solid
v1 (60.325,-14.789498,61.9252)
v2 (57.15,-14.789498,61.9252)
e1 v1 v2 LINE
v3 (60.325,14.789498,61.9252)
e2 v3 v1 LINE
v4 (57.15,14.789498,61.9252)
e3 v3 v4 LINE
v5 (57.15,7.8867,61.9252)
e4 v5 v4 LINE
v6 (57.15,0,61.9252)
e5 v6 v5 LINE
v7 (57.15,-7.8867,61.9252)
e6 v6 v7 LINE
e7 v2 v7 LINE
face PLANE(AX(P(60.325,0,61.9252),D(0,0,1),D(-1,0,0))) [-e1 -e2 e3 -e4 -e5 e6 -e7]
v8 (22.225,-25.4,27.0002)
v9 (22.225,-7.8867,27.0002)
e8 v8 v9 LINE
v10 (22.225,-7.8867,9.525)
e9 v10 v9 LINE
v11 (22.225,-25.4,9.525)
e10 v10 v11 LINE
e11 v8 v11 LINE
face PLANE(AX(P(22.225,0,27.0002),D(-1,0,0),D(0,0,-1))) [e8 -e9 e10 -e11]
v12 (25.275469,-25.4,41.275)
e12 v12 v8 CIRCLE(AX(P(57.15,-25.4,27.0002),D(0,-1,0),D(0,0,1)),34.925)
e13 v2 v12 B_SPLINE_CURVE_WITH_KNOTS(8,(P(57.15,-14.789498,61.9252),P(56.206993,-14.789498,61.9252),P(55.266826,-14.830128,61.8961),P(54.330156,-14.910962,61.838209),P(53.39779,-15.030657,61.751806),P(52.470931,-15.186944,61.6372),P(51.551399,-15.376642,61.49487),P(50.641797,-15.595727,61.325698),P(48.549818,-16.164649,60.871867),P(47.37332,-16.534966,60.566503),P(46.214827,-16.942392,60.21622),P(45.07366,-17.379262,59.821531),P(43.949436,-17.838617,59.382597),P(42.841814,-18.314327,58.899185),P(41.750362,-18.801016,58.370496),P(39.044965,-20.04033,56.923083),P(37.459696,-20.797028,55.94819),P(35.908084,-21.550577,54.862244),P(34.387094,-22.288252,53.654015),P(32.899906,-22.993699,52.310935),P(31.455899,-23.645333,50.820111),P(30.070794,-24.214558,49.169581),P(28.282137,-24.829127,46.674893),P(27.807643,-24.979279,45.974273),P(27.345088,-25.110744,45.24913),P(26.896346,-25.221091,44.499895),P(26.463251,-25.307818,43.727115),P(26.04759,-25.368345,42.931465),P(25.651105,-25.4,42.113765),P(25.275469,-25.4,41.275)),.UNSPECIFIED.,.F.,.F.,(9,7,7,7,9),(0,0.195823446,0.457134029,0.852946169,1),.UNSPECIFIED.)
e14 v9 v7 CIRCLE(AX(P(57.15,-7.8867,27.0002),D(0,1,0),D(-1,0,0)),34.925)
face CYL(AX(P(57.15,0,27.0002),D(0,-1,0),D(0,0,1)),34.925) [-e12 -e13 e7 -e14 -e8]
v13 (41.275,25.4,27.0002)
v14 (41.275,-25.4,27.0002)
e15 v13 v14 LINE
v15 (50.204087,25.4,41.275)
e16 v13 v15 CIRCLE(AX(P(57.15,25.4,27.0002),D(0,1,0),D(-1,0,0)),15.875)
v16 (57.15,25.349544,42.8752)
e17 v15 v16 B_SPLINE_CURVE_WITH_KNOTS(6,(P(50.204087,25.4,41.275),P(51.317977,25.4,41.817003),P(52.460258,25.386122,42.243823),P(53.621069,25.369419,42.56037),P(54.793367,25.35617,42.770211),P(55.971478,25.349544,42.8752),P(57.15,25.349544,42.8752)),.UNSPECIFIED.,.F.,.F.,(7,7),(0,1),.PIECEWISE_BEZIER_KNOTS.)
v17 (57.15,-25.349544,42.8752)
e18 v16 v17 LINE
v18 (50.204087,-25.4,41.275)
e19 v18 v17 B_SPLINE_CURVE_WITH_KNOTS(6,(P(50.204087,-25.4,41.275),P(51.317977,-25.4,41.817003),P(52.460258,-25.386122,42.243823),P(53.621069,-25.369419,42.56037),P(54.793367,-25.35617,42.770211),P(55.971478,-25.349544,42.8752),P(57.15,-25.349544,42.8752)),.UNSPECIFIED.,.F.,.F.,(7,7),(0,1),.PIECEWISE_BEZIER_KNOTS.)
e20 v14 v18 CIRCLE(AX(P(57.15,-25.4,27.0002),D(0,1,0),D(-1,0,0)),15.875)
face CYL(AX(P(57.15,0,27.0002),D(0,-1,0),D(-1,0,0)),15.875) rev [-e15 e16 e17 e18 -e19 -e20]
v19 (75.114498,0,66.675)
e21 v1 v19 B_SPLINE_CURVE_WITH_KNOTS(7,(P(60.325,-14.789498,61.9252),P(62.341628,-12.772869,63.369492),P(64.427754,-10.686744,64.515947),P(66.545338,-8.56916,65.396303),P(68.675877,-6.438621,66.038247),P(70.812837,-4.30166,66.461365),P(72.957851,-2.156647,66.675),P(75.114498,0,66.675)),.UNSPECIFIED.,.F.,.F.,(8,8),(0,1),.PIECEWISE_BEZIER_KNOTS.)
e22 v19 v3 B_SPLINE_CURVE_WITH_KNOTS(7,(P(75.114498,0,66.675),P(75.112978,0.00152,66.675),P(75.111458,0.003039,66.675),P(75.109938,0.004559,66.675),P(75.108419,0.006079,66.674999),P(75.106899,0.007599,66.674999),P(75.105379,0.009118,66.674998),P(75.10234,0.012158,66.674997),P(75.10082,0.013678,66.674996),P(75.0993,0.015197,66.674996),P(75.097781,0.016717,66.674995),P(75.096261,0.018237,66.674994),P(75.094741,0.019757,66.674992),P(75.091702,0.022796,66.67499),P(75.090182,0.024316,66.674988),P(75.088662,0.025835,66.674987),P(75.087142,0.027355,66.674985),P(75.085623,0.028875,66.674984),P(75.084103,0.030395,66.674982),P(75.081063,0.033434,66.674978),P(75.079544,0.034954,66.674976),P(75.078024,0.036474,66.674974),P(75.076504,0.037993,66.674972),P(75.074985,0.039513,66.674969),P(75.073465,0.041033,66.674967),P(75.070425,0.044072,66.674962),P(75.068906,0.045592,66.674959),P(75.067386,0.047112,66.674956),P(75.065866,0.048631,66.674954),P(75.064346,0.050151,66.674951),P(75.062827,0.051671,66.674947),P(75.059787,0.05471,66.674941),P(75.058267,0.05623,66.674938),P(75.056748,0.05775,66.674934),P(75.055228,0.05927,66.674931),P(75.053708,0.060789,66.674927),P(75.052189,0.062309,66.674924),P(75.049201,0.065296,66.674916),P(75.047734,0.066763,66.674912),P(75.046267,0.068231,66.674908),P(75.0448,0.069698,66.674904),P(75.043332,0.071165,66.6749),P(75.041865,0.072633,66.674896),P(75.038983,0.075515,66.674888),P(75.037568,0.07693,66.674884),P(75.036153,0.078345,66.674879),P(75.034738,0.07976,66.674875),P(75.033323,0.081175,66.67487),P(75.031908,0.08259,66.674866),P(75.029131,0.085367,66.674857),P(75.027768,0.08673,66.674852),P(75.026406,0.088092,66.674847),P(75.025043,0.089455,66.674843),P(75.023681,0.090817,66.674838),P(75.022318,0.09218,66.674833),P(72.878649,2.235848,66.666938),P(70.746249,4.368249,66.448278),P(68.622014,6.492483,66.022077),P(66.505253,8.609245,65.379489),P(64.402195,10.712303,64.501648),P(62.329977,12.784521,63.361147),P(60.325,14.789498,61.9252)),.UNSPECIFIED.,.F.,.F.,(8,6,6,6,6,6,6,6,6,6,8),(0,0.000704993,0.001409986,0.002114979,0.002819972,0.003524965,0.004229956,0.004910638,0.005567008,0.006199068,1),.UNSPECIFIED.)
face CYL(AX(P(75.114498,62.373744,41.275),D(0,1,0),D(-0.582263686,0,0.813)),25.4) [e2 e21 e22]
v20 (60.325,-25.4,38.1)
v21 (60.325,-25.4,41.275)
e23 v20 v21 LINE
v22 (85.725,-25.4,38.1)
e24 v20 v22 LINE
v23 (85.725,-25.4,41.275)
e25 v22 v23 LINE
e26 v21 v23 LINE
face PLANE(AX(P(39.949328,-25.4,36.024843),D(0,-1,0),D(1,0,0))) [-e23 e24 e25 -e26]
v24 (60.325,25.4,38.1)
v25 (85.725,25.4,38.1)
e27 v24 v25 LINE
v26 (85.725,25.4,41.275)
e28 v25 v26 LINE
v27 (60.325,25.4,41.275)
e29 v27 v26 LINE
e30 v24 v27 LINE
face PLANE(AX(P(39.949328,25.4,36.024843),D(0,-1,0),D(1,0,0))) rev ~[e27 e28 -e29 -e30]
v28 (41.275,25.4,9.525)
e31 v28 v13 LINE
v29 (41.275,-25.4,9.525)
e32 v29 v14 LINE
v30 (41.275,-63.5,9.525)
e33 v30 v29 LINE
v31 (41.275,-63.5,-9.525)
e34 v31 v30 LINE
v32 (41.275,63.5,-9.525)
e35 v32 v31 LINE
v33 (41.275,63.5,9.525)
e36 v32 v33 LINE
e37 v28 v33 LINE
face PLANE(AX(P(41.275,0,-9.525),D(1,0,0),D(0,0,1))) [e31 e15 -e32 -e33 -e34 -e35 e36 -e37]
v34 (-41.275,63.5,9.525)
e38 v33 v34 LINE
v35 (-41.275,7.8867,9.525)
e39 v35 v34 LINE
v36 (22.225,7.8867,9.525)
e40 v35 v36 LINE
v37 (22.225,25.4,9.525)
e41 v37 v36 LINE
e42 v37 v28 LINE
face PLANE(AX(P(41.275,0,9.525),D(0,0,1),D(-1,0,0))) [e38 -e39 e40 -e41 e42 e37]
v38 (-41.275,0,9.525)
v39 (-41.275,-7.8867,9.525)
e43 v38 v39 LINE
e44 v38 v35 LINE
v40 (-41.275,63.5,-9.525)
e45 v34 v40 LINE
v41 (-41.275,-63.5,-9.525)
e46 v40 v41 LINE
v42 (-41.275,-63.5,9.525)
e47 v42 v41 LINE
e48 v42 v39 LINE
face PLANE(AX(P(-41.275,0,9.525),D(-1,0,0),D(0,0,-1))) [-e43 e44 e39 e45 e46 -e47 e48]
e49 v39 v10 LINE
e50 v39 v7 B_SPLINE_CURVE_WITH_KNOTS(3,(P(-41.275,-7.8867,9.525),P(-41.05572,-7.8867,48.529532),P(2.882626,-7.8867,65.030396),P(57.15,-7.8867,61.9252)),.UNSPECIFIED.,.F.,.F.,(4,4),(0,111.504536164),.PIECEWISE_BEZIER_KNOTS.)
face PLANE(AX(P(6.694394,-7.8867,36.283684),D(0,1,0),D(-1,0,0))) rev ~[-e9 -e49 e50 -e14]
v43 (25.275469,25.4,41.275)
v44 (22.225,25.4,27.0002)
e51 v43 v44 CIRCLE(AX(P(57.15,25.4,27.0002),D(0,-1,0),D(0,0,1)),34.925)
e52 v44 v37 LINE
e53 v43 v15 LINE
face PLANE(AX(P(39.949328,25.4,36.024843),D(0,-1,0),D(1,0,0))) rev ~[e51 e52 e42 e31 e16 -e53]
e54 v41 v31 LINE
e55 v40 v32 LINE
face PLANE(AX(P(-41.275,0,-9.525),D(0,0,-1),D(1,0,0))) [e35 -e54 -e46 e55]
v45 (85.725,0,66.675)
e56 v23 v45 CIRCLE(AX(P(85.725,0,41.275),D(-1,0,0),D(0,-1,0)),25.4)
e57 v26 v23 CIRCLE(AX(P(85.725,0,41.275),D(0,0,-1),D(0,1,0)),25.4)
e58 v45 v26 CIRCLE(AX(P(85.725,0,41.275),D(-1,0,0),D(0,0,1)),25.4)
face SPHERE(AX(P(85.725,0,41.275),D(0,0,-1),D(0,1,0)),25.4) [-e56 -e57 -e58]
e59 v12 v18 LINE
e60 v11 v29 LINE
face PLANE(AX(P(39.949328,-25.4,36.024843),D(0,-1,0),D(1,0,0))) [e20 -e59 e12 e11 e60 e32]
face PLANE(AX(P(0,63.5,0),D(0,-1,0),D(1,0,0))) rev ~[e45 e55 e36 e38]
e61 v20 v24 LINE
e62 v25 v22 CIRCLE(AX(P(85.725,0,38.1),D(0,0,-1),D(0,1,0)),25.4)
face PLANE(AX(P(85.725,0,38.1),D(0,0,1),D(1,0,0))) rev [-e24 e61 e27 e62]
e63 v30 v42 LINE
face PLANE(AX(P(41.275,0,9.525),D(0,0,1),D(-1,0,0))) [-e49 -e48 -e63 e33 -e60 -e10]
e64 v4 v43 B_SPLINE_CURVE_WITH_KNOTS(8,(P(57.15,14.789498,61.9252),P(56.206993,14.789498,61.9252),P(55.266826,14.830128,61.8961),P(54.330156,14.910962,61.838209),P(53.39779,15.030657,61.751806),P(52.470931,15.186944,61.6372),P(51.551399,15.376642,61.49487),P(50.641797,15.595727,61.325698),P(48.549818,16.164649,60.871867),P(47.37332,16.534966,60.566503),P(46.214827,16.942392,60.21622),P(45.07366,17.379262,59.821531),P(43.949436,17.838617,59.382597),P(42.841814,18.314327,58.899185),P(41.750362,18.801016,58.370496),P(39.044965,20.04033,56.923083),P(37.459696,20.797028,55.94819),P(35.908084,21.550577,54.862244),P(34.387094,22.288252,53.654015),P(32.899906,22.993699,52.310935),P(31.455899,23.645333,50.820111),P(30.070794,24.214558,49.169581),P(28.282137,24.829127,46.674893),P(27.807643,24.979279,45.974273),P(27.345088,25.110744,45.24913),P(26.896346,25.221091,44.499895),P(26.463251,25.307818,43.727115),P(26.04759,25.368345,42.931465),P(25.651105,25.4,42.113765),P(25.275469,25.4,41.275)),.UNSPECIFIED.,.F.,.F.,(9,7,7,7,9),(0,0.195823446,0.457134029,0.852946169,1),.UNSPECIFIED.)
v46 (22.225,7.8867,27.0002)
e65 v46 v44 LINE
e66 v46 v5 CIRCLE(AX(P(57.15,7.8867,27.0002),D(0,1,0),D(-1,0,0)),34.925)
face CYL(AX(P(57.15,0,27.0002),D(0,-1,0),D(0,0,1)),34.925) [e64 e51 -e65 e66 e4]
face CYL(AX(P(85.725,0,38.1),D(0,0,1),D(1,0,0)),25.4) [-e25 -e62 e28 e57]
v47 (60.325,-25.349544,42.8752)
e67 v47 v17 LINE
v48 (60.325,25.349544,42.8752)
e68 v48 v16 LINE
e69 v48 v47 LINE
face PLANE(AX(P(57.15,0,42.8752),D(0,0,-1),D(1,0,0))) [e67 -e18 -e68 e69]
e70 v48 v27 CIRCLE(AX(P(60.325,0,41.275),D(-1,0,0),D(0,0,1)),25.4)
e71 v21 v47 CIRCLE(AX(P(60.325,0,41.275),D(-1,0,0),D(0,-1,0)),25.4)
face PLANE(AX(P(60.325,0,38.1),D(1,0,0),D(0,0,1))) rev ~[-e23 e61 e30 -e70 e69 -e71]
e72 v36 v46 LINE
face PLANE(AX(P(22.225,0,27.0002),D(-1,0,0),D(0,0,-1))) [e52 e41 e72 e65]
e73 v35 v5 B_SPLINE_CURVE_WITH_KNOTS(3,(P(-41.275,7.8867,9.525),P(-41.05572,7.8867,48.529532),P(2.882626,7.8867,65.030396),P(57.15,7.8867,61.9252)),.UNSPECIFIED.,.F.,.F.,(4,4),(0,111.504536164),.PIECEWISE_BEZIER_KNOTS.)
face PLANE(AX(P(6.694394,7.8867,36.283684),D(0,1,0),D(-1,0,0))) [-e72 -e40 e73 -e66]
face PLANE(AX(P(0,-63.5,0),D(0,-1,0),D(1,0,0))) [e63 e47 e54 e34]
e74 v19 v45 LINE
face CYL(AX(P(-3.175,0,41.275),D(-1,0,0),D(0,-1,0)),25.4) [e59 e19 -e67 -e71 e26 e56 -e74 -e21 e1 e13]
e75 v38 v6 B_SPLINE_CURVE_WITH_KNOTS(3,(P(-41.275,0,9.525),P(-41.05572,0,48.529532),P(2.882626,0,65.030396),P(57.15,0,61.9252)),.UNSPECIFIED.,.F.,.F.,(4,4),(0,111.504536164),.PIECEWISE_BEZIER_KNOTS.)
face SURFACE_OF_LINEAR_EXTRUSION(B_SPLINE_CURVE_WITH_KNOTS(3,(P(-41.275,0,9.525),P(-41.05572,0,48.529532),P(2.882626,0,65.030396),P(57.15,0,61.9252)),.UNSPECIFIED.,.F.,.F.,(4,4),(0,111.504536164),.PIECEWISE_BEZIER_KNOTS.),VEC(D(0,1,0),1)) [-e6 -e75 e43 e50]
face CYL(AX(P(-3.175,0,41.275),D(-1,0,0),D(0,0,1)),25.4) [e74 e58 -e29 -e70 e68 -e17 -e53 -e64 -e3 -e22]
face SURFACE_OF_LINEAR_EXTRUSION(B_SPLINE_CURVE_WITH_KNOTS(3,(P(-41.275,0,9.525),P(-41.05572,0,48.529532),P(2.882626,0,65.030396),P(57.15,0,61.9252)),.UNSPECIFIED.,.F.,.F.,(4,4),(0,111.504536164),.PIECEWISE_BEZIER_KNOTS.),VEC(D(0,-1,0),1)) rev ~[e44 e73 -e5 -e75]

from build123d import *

# Parameters (mm, degrees)
F1_DEPTH    = 63.5
F0_W        = 25.4
F0_H        = 19.05
F0_H_2      = 4.7498
F0_H_3      = 4.7752
F2_DEPTH    = 25.4
F3_DEPTH    = 7.8867
F5_T1_DEPTH = 124.7474881183
F5_T3_DEPTH = 88.9
F5_T6_ANGLE = 180


# Not quite as in the source:
# - a fillet or chamfer that OpenCascade refuses, or shapes differently, is made with other operations: its cross-section is extruded or revolved along the edge and cut away or added


with BuildPart() as f1:
    # F0 (on Front) → F1 (new body, symmetric)
    with BuildSketch(Plane.XZ):
        Polygon((22.225, 9.525), (-41.275, 9.525), (-41.275, -9.525), (41.275, -9.525), (41.275, 9.525), align=None)
    extrude(amount=F1_DEPTH, both=True)

    # F0 (on Front) → F2 (join, symmetric)
    with BuildSketch(Plane.XZ):
        with BuildLine():
            Line((22.225, 27.0002), (22.225, 9.525))
            Line((22.225, 9.525), (41.275, 9.525))
            Line((41.275, 9.525), (41.275, 27.0002))
            ThreePointArc((41.275, 27.0002), (45.9246798487, 38.2255201513), (57.15, 42.8752))
            Line((57.15, 42.8752), (60.325, 42.8752))
            Line((60.325, 42.8752), (60.325, 61.9252))
            Line((60.325, 61.9252), (57.15, 61.9252))
            ThreePointArc((57.15, 61.9252), (32.4542956671, 51.6959043329), (22.225, 27.0002))
        make_face()
        with Locations((73.025, 52.4002)):
            Rectangle(F0_W, F0_H)
        with Locations((73.025, 64.3001)):
            Rectangle(F0_W, F0_H_2)
        with Locations((73.025, 40.4876)):
            Rectangle(F0_W, F0_H_3)
    extrude(amount=F2_DEPTH, both=True)

    # F0 (on Front) → F3 (join, symmetric)
    with BuildSketch(Plane.XZ):
        with BuildLine():
            add(Edge.make_bspline(
                [(-41.275, 9.525), (-41.0557202995, 48.5295318067), (2.8826263733, 65.0303959846), (57.15, 61.9252)],
                knots=[0, 0, 0, 0, 111.5045361635, 111.5045361635, 111.5045361635, 111.5045361635], degree=3))
            Line((-41.275, 9.525), (22.225, 9.525))
            Line((22.225, 9.525), (22.225, 27.0002))
            ThreePointArc((22.225, 27.0002), (32.4542956671, 51.6959043329), (57.15, 61.9252))
        make_face()
    extrude(amount=F3_DEPTH, both=True)

    # F0 (on Front) → F4 (revolve)
    with BuildSketch(Plane.XZ):
        Polygon((85.725, 66.675), (85.725, 61.9252), (85.725, 42.8752), (85.725, 38.1), (111.125, 38.1), (111.125, 66.675), align=None)
    revolve(axis=Axis((85.725, 0, 52.3875), (0, 0, 1)))

    # F5: fillet of radius 25.4 on 4 edges, made by hand

    # F5_s2 → F5_t1 (cut)
    with BuildSketch(Plane.XZ.offset(-62.3737440591)):
        with BuildLine():
            ThreePointArc((60.325, 61.9252), (67.3477441191, 65.4584145645), (75.1144976237, 66.675))
            Line((75.1144976237, 66.675), (60.325, 66.675))
            Line((60.325, 66.675), (60.325, 61.9252))
        make_face()
    extrude(amount=F5_T1_DEPTH, mode=Mode.SUBTRACT)

    # F5_s4 → F5_t3 (cut)
    with BuildSketch(Plane.YZ.offset(-3.175)):
        with BuildLine():
            ThreePointArc((-25.4, 41.275), (-17.9605122421, 59.2355122421), (0, 66.675))
            Line((0, 66.675), (-25.4, 66.675))
            Line((-25.4, 66.675), (-25.4, 41.275))
        make_face()
        with BuildLine():
            ThreePointArc((0, 66.675), (17.9605122421, 59.2355122421), (25.4, 41.275))
            Line((25.4, 41.275), (25.4, 66.675))
            Line((25.4, 66.675), (0, 66.675))
        make_face()
    extrude(amount=F5_T3_DEPTH, mode=Mode.SUBTRACT)

    # F5_s5 → F5_t6 (revolve, cut)
    with BuildSketch(Plane.YZ.offset(85.725)):
        with BuildLine():
            ThreePointArc((0, 66.675), (17.9605122421, 59.2355122421), (25.4, 41.275))
            Line((25.4, 41.275), (25.4, 66.675))
            Line((25.4, 66.675), (0, 66.675))
        make_face()
    revolve(axis=Axis((85.725, 0, 66.675), (0, 0, -1)), revolution_arc=F5_T6_ANGLE, mode=Mode.SUBTRACT)


solid = f1.part
